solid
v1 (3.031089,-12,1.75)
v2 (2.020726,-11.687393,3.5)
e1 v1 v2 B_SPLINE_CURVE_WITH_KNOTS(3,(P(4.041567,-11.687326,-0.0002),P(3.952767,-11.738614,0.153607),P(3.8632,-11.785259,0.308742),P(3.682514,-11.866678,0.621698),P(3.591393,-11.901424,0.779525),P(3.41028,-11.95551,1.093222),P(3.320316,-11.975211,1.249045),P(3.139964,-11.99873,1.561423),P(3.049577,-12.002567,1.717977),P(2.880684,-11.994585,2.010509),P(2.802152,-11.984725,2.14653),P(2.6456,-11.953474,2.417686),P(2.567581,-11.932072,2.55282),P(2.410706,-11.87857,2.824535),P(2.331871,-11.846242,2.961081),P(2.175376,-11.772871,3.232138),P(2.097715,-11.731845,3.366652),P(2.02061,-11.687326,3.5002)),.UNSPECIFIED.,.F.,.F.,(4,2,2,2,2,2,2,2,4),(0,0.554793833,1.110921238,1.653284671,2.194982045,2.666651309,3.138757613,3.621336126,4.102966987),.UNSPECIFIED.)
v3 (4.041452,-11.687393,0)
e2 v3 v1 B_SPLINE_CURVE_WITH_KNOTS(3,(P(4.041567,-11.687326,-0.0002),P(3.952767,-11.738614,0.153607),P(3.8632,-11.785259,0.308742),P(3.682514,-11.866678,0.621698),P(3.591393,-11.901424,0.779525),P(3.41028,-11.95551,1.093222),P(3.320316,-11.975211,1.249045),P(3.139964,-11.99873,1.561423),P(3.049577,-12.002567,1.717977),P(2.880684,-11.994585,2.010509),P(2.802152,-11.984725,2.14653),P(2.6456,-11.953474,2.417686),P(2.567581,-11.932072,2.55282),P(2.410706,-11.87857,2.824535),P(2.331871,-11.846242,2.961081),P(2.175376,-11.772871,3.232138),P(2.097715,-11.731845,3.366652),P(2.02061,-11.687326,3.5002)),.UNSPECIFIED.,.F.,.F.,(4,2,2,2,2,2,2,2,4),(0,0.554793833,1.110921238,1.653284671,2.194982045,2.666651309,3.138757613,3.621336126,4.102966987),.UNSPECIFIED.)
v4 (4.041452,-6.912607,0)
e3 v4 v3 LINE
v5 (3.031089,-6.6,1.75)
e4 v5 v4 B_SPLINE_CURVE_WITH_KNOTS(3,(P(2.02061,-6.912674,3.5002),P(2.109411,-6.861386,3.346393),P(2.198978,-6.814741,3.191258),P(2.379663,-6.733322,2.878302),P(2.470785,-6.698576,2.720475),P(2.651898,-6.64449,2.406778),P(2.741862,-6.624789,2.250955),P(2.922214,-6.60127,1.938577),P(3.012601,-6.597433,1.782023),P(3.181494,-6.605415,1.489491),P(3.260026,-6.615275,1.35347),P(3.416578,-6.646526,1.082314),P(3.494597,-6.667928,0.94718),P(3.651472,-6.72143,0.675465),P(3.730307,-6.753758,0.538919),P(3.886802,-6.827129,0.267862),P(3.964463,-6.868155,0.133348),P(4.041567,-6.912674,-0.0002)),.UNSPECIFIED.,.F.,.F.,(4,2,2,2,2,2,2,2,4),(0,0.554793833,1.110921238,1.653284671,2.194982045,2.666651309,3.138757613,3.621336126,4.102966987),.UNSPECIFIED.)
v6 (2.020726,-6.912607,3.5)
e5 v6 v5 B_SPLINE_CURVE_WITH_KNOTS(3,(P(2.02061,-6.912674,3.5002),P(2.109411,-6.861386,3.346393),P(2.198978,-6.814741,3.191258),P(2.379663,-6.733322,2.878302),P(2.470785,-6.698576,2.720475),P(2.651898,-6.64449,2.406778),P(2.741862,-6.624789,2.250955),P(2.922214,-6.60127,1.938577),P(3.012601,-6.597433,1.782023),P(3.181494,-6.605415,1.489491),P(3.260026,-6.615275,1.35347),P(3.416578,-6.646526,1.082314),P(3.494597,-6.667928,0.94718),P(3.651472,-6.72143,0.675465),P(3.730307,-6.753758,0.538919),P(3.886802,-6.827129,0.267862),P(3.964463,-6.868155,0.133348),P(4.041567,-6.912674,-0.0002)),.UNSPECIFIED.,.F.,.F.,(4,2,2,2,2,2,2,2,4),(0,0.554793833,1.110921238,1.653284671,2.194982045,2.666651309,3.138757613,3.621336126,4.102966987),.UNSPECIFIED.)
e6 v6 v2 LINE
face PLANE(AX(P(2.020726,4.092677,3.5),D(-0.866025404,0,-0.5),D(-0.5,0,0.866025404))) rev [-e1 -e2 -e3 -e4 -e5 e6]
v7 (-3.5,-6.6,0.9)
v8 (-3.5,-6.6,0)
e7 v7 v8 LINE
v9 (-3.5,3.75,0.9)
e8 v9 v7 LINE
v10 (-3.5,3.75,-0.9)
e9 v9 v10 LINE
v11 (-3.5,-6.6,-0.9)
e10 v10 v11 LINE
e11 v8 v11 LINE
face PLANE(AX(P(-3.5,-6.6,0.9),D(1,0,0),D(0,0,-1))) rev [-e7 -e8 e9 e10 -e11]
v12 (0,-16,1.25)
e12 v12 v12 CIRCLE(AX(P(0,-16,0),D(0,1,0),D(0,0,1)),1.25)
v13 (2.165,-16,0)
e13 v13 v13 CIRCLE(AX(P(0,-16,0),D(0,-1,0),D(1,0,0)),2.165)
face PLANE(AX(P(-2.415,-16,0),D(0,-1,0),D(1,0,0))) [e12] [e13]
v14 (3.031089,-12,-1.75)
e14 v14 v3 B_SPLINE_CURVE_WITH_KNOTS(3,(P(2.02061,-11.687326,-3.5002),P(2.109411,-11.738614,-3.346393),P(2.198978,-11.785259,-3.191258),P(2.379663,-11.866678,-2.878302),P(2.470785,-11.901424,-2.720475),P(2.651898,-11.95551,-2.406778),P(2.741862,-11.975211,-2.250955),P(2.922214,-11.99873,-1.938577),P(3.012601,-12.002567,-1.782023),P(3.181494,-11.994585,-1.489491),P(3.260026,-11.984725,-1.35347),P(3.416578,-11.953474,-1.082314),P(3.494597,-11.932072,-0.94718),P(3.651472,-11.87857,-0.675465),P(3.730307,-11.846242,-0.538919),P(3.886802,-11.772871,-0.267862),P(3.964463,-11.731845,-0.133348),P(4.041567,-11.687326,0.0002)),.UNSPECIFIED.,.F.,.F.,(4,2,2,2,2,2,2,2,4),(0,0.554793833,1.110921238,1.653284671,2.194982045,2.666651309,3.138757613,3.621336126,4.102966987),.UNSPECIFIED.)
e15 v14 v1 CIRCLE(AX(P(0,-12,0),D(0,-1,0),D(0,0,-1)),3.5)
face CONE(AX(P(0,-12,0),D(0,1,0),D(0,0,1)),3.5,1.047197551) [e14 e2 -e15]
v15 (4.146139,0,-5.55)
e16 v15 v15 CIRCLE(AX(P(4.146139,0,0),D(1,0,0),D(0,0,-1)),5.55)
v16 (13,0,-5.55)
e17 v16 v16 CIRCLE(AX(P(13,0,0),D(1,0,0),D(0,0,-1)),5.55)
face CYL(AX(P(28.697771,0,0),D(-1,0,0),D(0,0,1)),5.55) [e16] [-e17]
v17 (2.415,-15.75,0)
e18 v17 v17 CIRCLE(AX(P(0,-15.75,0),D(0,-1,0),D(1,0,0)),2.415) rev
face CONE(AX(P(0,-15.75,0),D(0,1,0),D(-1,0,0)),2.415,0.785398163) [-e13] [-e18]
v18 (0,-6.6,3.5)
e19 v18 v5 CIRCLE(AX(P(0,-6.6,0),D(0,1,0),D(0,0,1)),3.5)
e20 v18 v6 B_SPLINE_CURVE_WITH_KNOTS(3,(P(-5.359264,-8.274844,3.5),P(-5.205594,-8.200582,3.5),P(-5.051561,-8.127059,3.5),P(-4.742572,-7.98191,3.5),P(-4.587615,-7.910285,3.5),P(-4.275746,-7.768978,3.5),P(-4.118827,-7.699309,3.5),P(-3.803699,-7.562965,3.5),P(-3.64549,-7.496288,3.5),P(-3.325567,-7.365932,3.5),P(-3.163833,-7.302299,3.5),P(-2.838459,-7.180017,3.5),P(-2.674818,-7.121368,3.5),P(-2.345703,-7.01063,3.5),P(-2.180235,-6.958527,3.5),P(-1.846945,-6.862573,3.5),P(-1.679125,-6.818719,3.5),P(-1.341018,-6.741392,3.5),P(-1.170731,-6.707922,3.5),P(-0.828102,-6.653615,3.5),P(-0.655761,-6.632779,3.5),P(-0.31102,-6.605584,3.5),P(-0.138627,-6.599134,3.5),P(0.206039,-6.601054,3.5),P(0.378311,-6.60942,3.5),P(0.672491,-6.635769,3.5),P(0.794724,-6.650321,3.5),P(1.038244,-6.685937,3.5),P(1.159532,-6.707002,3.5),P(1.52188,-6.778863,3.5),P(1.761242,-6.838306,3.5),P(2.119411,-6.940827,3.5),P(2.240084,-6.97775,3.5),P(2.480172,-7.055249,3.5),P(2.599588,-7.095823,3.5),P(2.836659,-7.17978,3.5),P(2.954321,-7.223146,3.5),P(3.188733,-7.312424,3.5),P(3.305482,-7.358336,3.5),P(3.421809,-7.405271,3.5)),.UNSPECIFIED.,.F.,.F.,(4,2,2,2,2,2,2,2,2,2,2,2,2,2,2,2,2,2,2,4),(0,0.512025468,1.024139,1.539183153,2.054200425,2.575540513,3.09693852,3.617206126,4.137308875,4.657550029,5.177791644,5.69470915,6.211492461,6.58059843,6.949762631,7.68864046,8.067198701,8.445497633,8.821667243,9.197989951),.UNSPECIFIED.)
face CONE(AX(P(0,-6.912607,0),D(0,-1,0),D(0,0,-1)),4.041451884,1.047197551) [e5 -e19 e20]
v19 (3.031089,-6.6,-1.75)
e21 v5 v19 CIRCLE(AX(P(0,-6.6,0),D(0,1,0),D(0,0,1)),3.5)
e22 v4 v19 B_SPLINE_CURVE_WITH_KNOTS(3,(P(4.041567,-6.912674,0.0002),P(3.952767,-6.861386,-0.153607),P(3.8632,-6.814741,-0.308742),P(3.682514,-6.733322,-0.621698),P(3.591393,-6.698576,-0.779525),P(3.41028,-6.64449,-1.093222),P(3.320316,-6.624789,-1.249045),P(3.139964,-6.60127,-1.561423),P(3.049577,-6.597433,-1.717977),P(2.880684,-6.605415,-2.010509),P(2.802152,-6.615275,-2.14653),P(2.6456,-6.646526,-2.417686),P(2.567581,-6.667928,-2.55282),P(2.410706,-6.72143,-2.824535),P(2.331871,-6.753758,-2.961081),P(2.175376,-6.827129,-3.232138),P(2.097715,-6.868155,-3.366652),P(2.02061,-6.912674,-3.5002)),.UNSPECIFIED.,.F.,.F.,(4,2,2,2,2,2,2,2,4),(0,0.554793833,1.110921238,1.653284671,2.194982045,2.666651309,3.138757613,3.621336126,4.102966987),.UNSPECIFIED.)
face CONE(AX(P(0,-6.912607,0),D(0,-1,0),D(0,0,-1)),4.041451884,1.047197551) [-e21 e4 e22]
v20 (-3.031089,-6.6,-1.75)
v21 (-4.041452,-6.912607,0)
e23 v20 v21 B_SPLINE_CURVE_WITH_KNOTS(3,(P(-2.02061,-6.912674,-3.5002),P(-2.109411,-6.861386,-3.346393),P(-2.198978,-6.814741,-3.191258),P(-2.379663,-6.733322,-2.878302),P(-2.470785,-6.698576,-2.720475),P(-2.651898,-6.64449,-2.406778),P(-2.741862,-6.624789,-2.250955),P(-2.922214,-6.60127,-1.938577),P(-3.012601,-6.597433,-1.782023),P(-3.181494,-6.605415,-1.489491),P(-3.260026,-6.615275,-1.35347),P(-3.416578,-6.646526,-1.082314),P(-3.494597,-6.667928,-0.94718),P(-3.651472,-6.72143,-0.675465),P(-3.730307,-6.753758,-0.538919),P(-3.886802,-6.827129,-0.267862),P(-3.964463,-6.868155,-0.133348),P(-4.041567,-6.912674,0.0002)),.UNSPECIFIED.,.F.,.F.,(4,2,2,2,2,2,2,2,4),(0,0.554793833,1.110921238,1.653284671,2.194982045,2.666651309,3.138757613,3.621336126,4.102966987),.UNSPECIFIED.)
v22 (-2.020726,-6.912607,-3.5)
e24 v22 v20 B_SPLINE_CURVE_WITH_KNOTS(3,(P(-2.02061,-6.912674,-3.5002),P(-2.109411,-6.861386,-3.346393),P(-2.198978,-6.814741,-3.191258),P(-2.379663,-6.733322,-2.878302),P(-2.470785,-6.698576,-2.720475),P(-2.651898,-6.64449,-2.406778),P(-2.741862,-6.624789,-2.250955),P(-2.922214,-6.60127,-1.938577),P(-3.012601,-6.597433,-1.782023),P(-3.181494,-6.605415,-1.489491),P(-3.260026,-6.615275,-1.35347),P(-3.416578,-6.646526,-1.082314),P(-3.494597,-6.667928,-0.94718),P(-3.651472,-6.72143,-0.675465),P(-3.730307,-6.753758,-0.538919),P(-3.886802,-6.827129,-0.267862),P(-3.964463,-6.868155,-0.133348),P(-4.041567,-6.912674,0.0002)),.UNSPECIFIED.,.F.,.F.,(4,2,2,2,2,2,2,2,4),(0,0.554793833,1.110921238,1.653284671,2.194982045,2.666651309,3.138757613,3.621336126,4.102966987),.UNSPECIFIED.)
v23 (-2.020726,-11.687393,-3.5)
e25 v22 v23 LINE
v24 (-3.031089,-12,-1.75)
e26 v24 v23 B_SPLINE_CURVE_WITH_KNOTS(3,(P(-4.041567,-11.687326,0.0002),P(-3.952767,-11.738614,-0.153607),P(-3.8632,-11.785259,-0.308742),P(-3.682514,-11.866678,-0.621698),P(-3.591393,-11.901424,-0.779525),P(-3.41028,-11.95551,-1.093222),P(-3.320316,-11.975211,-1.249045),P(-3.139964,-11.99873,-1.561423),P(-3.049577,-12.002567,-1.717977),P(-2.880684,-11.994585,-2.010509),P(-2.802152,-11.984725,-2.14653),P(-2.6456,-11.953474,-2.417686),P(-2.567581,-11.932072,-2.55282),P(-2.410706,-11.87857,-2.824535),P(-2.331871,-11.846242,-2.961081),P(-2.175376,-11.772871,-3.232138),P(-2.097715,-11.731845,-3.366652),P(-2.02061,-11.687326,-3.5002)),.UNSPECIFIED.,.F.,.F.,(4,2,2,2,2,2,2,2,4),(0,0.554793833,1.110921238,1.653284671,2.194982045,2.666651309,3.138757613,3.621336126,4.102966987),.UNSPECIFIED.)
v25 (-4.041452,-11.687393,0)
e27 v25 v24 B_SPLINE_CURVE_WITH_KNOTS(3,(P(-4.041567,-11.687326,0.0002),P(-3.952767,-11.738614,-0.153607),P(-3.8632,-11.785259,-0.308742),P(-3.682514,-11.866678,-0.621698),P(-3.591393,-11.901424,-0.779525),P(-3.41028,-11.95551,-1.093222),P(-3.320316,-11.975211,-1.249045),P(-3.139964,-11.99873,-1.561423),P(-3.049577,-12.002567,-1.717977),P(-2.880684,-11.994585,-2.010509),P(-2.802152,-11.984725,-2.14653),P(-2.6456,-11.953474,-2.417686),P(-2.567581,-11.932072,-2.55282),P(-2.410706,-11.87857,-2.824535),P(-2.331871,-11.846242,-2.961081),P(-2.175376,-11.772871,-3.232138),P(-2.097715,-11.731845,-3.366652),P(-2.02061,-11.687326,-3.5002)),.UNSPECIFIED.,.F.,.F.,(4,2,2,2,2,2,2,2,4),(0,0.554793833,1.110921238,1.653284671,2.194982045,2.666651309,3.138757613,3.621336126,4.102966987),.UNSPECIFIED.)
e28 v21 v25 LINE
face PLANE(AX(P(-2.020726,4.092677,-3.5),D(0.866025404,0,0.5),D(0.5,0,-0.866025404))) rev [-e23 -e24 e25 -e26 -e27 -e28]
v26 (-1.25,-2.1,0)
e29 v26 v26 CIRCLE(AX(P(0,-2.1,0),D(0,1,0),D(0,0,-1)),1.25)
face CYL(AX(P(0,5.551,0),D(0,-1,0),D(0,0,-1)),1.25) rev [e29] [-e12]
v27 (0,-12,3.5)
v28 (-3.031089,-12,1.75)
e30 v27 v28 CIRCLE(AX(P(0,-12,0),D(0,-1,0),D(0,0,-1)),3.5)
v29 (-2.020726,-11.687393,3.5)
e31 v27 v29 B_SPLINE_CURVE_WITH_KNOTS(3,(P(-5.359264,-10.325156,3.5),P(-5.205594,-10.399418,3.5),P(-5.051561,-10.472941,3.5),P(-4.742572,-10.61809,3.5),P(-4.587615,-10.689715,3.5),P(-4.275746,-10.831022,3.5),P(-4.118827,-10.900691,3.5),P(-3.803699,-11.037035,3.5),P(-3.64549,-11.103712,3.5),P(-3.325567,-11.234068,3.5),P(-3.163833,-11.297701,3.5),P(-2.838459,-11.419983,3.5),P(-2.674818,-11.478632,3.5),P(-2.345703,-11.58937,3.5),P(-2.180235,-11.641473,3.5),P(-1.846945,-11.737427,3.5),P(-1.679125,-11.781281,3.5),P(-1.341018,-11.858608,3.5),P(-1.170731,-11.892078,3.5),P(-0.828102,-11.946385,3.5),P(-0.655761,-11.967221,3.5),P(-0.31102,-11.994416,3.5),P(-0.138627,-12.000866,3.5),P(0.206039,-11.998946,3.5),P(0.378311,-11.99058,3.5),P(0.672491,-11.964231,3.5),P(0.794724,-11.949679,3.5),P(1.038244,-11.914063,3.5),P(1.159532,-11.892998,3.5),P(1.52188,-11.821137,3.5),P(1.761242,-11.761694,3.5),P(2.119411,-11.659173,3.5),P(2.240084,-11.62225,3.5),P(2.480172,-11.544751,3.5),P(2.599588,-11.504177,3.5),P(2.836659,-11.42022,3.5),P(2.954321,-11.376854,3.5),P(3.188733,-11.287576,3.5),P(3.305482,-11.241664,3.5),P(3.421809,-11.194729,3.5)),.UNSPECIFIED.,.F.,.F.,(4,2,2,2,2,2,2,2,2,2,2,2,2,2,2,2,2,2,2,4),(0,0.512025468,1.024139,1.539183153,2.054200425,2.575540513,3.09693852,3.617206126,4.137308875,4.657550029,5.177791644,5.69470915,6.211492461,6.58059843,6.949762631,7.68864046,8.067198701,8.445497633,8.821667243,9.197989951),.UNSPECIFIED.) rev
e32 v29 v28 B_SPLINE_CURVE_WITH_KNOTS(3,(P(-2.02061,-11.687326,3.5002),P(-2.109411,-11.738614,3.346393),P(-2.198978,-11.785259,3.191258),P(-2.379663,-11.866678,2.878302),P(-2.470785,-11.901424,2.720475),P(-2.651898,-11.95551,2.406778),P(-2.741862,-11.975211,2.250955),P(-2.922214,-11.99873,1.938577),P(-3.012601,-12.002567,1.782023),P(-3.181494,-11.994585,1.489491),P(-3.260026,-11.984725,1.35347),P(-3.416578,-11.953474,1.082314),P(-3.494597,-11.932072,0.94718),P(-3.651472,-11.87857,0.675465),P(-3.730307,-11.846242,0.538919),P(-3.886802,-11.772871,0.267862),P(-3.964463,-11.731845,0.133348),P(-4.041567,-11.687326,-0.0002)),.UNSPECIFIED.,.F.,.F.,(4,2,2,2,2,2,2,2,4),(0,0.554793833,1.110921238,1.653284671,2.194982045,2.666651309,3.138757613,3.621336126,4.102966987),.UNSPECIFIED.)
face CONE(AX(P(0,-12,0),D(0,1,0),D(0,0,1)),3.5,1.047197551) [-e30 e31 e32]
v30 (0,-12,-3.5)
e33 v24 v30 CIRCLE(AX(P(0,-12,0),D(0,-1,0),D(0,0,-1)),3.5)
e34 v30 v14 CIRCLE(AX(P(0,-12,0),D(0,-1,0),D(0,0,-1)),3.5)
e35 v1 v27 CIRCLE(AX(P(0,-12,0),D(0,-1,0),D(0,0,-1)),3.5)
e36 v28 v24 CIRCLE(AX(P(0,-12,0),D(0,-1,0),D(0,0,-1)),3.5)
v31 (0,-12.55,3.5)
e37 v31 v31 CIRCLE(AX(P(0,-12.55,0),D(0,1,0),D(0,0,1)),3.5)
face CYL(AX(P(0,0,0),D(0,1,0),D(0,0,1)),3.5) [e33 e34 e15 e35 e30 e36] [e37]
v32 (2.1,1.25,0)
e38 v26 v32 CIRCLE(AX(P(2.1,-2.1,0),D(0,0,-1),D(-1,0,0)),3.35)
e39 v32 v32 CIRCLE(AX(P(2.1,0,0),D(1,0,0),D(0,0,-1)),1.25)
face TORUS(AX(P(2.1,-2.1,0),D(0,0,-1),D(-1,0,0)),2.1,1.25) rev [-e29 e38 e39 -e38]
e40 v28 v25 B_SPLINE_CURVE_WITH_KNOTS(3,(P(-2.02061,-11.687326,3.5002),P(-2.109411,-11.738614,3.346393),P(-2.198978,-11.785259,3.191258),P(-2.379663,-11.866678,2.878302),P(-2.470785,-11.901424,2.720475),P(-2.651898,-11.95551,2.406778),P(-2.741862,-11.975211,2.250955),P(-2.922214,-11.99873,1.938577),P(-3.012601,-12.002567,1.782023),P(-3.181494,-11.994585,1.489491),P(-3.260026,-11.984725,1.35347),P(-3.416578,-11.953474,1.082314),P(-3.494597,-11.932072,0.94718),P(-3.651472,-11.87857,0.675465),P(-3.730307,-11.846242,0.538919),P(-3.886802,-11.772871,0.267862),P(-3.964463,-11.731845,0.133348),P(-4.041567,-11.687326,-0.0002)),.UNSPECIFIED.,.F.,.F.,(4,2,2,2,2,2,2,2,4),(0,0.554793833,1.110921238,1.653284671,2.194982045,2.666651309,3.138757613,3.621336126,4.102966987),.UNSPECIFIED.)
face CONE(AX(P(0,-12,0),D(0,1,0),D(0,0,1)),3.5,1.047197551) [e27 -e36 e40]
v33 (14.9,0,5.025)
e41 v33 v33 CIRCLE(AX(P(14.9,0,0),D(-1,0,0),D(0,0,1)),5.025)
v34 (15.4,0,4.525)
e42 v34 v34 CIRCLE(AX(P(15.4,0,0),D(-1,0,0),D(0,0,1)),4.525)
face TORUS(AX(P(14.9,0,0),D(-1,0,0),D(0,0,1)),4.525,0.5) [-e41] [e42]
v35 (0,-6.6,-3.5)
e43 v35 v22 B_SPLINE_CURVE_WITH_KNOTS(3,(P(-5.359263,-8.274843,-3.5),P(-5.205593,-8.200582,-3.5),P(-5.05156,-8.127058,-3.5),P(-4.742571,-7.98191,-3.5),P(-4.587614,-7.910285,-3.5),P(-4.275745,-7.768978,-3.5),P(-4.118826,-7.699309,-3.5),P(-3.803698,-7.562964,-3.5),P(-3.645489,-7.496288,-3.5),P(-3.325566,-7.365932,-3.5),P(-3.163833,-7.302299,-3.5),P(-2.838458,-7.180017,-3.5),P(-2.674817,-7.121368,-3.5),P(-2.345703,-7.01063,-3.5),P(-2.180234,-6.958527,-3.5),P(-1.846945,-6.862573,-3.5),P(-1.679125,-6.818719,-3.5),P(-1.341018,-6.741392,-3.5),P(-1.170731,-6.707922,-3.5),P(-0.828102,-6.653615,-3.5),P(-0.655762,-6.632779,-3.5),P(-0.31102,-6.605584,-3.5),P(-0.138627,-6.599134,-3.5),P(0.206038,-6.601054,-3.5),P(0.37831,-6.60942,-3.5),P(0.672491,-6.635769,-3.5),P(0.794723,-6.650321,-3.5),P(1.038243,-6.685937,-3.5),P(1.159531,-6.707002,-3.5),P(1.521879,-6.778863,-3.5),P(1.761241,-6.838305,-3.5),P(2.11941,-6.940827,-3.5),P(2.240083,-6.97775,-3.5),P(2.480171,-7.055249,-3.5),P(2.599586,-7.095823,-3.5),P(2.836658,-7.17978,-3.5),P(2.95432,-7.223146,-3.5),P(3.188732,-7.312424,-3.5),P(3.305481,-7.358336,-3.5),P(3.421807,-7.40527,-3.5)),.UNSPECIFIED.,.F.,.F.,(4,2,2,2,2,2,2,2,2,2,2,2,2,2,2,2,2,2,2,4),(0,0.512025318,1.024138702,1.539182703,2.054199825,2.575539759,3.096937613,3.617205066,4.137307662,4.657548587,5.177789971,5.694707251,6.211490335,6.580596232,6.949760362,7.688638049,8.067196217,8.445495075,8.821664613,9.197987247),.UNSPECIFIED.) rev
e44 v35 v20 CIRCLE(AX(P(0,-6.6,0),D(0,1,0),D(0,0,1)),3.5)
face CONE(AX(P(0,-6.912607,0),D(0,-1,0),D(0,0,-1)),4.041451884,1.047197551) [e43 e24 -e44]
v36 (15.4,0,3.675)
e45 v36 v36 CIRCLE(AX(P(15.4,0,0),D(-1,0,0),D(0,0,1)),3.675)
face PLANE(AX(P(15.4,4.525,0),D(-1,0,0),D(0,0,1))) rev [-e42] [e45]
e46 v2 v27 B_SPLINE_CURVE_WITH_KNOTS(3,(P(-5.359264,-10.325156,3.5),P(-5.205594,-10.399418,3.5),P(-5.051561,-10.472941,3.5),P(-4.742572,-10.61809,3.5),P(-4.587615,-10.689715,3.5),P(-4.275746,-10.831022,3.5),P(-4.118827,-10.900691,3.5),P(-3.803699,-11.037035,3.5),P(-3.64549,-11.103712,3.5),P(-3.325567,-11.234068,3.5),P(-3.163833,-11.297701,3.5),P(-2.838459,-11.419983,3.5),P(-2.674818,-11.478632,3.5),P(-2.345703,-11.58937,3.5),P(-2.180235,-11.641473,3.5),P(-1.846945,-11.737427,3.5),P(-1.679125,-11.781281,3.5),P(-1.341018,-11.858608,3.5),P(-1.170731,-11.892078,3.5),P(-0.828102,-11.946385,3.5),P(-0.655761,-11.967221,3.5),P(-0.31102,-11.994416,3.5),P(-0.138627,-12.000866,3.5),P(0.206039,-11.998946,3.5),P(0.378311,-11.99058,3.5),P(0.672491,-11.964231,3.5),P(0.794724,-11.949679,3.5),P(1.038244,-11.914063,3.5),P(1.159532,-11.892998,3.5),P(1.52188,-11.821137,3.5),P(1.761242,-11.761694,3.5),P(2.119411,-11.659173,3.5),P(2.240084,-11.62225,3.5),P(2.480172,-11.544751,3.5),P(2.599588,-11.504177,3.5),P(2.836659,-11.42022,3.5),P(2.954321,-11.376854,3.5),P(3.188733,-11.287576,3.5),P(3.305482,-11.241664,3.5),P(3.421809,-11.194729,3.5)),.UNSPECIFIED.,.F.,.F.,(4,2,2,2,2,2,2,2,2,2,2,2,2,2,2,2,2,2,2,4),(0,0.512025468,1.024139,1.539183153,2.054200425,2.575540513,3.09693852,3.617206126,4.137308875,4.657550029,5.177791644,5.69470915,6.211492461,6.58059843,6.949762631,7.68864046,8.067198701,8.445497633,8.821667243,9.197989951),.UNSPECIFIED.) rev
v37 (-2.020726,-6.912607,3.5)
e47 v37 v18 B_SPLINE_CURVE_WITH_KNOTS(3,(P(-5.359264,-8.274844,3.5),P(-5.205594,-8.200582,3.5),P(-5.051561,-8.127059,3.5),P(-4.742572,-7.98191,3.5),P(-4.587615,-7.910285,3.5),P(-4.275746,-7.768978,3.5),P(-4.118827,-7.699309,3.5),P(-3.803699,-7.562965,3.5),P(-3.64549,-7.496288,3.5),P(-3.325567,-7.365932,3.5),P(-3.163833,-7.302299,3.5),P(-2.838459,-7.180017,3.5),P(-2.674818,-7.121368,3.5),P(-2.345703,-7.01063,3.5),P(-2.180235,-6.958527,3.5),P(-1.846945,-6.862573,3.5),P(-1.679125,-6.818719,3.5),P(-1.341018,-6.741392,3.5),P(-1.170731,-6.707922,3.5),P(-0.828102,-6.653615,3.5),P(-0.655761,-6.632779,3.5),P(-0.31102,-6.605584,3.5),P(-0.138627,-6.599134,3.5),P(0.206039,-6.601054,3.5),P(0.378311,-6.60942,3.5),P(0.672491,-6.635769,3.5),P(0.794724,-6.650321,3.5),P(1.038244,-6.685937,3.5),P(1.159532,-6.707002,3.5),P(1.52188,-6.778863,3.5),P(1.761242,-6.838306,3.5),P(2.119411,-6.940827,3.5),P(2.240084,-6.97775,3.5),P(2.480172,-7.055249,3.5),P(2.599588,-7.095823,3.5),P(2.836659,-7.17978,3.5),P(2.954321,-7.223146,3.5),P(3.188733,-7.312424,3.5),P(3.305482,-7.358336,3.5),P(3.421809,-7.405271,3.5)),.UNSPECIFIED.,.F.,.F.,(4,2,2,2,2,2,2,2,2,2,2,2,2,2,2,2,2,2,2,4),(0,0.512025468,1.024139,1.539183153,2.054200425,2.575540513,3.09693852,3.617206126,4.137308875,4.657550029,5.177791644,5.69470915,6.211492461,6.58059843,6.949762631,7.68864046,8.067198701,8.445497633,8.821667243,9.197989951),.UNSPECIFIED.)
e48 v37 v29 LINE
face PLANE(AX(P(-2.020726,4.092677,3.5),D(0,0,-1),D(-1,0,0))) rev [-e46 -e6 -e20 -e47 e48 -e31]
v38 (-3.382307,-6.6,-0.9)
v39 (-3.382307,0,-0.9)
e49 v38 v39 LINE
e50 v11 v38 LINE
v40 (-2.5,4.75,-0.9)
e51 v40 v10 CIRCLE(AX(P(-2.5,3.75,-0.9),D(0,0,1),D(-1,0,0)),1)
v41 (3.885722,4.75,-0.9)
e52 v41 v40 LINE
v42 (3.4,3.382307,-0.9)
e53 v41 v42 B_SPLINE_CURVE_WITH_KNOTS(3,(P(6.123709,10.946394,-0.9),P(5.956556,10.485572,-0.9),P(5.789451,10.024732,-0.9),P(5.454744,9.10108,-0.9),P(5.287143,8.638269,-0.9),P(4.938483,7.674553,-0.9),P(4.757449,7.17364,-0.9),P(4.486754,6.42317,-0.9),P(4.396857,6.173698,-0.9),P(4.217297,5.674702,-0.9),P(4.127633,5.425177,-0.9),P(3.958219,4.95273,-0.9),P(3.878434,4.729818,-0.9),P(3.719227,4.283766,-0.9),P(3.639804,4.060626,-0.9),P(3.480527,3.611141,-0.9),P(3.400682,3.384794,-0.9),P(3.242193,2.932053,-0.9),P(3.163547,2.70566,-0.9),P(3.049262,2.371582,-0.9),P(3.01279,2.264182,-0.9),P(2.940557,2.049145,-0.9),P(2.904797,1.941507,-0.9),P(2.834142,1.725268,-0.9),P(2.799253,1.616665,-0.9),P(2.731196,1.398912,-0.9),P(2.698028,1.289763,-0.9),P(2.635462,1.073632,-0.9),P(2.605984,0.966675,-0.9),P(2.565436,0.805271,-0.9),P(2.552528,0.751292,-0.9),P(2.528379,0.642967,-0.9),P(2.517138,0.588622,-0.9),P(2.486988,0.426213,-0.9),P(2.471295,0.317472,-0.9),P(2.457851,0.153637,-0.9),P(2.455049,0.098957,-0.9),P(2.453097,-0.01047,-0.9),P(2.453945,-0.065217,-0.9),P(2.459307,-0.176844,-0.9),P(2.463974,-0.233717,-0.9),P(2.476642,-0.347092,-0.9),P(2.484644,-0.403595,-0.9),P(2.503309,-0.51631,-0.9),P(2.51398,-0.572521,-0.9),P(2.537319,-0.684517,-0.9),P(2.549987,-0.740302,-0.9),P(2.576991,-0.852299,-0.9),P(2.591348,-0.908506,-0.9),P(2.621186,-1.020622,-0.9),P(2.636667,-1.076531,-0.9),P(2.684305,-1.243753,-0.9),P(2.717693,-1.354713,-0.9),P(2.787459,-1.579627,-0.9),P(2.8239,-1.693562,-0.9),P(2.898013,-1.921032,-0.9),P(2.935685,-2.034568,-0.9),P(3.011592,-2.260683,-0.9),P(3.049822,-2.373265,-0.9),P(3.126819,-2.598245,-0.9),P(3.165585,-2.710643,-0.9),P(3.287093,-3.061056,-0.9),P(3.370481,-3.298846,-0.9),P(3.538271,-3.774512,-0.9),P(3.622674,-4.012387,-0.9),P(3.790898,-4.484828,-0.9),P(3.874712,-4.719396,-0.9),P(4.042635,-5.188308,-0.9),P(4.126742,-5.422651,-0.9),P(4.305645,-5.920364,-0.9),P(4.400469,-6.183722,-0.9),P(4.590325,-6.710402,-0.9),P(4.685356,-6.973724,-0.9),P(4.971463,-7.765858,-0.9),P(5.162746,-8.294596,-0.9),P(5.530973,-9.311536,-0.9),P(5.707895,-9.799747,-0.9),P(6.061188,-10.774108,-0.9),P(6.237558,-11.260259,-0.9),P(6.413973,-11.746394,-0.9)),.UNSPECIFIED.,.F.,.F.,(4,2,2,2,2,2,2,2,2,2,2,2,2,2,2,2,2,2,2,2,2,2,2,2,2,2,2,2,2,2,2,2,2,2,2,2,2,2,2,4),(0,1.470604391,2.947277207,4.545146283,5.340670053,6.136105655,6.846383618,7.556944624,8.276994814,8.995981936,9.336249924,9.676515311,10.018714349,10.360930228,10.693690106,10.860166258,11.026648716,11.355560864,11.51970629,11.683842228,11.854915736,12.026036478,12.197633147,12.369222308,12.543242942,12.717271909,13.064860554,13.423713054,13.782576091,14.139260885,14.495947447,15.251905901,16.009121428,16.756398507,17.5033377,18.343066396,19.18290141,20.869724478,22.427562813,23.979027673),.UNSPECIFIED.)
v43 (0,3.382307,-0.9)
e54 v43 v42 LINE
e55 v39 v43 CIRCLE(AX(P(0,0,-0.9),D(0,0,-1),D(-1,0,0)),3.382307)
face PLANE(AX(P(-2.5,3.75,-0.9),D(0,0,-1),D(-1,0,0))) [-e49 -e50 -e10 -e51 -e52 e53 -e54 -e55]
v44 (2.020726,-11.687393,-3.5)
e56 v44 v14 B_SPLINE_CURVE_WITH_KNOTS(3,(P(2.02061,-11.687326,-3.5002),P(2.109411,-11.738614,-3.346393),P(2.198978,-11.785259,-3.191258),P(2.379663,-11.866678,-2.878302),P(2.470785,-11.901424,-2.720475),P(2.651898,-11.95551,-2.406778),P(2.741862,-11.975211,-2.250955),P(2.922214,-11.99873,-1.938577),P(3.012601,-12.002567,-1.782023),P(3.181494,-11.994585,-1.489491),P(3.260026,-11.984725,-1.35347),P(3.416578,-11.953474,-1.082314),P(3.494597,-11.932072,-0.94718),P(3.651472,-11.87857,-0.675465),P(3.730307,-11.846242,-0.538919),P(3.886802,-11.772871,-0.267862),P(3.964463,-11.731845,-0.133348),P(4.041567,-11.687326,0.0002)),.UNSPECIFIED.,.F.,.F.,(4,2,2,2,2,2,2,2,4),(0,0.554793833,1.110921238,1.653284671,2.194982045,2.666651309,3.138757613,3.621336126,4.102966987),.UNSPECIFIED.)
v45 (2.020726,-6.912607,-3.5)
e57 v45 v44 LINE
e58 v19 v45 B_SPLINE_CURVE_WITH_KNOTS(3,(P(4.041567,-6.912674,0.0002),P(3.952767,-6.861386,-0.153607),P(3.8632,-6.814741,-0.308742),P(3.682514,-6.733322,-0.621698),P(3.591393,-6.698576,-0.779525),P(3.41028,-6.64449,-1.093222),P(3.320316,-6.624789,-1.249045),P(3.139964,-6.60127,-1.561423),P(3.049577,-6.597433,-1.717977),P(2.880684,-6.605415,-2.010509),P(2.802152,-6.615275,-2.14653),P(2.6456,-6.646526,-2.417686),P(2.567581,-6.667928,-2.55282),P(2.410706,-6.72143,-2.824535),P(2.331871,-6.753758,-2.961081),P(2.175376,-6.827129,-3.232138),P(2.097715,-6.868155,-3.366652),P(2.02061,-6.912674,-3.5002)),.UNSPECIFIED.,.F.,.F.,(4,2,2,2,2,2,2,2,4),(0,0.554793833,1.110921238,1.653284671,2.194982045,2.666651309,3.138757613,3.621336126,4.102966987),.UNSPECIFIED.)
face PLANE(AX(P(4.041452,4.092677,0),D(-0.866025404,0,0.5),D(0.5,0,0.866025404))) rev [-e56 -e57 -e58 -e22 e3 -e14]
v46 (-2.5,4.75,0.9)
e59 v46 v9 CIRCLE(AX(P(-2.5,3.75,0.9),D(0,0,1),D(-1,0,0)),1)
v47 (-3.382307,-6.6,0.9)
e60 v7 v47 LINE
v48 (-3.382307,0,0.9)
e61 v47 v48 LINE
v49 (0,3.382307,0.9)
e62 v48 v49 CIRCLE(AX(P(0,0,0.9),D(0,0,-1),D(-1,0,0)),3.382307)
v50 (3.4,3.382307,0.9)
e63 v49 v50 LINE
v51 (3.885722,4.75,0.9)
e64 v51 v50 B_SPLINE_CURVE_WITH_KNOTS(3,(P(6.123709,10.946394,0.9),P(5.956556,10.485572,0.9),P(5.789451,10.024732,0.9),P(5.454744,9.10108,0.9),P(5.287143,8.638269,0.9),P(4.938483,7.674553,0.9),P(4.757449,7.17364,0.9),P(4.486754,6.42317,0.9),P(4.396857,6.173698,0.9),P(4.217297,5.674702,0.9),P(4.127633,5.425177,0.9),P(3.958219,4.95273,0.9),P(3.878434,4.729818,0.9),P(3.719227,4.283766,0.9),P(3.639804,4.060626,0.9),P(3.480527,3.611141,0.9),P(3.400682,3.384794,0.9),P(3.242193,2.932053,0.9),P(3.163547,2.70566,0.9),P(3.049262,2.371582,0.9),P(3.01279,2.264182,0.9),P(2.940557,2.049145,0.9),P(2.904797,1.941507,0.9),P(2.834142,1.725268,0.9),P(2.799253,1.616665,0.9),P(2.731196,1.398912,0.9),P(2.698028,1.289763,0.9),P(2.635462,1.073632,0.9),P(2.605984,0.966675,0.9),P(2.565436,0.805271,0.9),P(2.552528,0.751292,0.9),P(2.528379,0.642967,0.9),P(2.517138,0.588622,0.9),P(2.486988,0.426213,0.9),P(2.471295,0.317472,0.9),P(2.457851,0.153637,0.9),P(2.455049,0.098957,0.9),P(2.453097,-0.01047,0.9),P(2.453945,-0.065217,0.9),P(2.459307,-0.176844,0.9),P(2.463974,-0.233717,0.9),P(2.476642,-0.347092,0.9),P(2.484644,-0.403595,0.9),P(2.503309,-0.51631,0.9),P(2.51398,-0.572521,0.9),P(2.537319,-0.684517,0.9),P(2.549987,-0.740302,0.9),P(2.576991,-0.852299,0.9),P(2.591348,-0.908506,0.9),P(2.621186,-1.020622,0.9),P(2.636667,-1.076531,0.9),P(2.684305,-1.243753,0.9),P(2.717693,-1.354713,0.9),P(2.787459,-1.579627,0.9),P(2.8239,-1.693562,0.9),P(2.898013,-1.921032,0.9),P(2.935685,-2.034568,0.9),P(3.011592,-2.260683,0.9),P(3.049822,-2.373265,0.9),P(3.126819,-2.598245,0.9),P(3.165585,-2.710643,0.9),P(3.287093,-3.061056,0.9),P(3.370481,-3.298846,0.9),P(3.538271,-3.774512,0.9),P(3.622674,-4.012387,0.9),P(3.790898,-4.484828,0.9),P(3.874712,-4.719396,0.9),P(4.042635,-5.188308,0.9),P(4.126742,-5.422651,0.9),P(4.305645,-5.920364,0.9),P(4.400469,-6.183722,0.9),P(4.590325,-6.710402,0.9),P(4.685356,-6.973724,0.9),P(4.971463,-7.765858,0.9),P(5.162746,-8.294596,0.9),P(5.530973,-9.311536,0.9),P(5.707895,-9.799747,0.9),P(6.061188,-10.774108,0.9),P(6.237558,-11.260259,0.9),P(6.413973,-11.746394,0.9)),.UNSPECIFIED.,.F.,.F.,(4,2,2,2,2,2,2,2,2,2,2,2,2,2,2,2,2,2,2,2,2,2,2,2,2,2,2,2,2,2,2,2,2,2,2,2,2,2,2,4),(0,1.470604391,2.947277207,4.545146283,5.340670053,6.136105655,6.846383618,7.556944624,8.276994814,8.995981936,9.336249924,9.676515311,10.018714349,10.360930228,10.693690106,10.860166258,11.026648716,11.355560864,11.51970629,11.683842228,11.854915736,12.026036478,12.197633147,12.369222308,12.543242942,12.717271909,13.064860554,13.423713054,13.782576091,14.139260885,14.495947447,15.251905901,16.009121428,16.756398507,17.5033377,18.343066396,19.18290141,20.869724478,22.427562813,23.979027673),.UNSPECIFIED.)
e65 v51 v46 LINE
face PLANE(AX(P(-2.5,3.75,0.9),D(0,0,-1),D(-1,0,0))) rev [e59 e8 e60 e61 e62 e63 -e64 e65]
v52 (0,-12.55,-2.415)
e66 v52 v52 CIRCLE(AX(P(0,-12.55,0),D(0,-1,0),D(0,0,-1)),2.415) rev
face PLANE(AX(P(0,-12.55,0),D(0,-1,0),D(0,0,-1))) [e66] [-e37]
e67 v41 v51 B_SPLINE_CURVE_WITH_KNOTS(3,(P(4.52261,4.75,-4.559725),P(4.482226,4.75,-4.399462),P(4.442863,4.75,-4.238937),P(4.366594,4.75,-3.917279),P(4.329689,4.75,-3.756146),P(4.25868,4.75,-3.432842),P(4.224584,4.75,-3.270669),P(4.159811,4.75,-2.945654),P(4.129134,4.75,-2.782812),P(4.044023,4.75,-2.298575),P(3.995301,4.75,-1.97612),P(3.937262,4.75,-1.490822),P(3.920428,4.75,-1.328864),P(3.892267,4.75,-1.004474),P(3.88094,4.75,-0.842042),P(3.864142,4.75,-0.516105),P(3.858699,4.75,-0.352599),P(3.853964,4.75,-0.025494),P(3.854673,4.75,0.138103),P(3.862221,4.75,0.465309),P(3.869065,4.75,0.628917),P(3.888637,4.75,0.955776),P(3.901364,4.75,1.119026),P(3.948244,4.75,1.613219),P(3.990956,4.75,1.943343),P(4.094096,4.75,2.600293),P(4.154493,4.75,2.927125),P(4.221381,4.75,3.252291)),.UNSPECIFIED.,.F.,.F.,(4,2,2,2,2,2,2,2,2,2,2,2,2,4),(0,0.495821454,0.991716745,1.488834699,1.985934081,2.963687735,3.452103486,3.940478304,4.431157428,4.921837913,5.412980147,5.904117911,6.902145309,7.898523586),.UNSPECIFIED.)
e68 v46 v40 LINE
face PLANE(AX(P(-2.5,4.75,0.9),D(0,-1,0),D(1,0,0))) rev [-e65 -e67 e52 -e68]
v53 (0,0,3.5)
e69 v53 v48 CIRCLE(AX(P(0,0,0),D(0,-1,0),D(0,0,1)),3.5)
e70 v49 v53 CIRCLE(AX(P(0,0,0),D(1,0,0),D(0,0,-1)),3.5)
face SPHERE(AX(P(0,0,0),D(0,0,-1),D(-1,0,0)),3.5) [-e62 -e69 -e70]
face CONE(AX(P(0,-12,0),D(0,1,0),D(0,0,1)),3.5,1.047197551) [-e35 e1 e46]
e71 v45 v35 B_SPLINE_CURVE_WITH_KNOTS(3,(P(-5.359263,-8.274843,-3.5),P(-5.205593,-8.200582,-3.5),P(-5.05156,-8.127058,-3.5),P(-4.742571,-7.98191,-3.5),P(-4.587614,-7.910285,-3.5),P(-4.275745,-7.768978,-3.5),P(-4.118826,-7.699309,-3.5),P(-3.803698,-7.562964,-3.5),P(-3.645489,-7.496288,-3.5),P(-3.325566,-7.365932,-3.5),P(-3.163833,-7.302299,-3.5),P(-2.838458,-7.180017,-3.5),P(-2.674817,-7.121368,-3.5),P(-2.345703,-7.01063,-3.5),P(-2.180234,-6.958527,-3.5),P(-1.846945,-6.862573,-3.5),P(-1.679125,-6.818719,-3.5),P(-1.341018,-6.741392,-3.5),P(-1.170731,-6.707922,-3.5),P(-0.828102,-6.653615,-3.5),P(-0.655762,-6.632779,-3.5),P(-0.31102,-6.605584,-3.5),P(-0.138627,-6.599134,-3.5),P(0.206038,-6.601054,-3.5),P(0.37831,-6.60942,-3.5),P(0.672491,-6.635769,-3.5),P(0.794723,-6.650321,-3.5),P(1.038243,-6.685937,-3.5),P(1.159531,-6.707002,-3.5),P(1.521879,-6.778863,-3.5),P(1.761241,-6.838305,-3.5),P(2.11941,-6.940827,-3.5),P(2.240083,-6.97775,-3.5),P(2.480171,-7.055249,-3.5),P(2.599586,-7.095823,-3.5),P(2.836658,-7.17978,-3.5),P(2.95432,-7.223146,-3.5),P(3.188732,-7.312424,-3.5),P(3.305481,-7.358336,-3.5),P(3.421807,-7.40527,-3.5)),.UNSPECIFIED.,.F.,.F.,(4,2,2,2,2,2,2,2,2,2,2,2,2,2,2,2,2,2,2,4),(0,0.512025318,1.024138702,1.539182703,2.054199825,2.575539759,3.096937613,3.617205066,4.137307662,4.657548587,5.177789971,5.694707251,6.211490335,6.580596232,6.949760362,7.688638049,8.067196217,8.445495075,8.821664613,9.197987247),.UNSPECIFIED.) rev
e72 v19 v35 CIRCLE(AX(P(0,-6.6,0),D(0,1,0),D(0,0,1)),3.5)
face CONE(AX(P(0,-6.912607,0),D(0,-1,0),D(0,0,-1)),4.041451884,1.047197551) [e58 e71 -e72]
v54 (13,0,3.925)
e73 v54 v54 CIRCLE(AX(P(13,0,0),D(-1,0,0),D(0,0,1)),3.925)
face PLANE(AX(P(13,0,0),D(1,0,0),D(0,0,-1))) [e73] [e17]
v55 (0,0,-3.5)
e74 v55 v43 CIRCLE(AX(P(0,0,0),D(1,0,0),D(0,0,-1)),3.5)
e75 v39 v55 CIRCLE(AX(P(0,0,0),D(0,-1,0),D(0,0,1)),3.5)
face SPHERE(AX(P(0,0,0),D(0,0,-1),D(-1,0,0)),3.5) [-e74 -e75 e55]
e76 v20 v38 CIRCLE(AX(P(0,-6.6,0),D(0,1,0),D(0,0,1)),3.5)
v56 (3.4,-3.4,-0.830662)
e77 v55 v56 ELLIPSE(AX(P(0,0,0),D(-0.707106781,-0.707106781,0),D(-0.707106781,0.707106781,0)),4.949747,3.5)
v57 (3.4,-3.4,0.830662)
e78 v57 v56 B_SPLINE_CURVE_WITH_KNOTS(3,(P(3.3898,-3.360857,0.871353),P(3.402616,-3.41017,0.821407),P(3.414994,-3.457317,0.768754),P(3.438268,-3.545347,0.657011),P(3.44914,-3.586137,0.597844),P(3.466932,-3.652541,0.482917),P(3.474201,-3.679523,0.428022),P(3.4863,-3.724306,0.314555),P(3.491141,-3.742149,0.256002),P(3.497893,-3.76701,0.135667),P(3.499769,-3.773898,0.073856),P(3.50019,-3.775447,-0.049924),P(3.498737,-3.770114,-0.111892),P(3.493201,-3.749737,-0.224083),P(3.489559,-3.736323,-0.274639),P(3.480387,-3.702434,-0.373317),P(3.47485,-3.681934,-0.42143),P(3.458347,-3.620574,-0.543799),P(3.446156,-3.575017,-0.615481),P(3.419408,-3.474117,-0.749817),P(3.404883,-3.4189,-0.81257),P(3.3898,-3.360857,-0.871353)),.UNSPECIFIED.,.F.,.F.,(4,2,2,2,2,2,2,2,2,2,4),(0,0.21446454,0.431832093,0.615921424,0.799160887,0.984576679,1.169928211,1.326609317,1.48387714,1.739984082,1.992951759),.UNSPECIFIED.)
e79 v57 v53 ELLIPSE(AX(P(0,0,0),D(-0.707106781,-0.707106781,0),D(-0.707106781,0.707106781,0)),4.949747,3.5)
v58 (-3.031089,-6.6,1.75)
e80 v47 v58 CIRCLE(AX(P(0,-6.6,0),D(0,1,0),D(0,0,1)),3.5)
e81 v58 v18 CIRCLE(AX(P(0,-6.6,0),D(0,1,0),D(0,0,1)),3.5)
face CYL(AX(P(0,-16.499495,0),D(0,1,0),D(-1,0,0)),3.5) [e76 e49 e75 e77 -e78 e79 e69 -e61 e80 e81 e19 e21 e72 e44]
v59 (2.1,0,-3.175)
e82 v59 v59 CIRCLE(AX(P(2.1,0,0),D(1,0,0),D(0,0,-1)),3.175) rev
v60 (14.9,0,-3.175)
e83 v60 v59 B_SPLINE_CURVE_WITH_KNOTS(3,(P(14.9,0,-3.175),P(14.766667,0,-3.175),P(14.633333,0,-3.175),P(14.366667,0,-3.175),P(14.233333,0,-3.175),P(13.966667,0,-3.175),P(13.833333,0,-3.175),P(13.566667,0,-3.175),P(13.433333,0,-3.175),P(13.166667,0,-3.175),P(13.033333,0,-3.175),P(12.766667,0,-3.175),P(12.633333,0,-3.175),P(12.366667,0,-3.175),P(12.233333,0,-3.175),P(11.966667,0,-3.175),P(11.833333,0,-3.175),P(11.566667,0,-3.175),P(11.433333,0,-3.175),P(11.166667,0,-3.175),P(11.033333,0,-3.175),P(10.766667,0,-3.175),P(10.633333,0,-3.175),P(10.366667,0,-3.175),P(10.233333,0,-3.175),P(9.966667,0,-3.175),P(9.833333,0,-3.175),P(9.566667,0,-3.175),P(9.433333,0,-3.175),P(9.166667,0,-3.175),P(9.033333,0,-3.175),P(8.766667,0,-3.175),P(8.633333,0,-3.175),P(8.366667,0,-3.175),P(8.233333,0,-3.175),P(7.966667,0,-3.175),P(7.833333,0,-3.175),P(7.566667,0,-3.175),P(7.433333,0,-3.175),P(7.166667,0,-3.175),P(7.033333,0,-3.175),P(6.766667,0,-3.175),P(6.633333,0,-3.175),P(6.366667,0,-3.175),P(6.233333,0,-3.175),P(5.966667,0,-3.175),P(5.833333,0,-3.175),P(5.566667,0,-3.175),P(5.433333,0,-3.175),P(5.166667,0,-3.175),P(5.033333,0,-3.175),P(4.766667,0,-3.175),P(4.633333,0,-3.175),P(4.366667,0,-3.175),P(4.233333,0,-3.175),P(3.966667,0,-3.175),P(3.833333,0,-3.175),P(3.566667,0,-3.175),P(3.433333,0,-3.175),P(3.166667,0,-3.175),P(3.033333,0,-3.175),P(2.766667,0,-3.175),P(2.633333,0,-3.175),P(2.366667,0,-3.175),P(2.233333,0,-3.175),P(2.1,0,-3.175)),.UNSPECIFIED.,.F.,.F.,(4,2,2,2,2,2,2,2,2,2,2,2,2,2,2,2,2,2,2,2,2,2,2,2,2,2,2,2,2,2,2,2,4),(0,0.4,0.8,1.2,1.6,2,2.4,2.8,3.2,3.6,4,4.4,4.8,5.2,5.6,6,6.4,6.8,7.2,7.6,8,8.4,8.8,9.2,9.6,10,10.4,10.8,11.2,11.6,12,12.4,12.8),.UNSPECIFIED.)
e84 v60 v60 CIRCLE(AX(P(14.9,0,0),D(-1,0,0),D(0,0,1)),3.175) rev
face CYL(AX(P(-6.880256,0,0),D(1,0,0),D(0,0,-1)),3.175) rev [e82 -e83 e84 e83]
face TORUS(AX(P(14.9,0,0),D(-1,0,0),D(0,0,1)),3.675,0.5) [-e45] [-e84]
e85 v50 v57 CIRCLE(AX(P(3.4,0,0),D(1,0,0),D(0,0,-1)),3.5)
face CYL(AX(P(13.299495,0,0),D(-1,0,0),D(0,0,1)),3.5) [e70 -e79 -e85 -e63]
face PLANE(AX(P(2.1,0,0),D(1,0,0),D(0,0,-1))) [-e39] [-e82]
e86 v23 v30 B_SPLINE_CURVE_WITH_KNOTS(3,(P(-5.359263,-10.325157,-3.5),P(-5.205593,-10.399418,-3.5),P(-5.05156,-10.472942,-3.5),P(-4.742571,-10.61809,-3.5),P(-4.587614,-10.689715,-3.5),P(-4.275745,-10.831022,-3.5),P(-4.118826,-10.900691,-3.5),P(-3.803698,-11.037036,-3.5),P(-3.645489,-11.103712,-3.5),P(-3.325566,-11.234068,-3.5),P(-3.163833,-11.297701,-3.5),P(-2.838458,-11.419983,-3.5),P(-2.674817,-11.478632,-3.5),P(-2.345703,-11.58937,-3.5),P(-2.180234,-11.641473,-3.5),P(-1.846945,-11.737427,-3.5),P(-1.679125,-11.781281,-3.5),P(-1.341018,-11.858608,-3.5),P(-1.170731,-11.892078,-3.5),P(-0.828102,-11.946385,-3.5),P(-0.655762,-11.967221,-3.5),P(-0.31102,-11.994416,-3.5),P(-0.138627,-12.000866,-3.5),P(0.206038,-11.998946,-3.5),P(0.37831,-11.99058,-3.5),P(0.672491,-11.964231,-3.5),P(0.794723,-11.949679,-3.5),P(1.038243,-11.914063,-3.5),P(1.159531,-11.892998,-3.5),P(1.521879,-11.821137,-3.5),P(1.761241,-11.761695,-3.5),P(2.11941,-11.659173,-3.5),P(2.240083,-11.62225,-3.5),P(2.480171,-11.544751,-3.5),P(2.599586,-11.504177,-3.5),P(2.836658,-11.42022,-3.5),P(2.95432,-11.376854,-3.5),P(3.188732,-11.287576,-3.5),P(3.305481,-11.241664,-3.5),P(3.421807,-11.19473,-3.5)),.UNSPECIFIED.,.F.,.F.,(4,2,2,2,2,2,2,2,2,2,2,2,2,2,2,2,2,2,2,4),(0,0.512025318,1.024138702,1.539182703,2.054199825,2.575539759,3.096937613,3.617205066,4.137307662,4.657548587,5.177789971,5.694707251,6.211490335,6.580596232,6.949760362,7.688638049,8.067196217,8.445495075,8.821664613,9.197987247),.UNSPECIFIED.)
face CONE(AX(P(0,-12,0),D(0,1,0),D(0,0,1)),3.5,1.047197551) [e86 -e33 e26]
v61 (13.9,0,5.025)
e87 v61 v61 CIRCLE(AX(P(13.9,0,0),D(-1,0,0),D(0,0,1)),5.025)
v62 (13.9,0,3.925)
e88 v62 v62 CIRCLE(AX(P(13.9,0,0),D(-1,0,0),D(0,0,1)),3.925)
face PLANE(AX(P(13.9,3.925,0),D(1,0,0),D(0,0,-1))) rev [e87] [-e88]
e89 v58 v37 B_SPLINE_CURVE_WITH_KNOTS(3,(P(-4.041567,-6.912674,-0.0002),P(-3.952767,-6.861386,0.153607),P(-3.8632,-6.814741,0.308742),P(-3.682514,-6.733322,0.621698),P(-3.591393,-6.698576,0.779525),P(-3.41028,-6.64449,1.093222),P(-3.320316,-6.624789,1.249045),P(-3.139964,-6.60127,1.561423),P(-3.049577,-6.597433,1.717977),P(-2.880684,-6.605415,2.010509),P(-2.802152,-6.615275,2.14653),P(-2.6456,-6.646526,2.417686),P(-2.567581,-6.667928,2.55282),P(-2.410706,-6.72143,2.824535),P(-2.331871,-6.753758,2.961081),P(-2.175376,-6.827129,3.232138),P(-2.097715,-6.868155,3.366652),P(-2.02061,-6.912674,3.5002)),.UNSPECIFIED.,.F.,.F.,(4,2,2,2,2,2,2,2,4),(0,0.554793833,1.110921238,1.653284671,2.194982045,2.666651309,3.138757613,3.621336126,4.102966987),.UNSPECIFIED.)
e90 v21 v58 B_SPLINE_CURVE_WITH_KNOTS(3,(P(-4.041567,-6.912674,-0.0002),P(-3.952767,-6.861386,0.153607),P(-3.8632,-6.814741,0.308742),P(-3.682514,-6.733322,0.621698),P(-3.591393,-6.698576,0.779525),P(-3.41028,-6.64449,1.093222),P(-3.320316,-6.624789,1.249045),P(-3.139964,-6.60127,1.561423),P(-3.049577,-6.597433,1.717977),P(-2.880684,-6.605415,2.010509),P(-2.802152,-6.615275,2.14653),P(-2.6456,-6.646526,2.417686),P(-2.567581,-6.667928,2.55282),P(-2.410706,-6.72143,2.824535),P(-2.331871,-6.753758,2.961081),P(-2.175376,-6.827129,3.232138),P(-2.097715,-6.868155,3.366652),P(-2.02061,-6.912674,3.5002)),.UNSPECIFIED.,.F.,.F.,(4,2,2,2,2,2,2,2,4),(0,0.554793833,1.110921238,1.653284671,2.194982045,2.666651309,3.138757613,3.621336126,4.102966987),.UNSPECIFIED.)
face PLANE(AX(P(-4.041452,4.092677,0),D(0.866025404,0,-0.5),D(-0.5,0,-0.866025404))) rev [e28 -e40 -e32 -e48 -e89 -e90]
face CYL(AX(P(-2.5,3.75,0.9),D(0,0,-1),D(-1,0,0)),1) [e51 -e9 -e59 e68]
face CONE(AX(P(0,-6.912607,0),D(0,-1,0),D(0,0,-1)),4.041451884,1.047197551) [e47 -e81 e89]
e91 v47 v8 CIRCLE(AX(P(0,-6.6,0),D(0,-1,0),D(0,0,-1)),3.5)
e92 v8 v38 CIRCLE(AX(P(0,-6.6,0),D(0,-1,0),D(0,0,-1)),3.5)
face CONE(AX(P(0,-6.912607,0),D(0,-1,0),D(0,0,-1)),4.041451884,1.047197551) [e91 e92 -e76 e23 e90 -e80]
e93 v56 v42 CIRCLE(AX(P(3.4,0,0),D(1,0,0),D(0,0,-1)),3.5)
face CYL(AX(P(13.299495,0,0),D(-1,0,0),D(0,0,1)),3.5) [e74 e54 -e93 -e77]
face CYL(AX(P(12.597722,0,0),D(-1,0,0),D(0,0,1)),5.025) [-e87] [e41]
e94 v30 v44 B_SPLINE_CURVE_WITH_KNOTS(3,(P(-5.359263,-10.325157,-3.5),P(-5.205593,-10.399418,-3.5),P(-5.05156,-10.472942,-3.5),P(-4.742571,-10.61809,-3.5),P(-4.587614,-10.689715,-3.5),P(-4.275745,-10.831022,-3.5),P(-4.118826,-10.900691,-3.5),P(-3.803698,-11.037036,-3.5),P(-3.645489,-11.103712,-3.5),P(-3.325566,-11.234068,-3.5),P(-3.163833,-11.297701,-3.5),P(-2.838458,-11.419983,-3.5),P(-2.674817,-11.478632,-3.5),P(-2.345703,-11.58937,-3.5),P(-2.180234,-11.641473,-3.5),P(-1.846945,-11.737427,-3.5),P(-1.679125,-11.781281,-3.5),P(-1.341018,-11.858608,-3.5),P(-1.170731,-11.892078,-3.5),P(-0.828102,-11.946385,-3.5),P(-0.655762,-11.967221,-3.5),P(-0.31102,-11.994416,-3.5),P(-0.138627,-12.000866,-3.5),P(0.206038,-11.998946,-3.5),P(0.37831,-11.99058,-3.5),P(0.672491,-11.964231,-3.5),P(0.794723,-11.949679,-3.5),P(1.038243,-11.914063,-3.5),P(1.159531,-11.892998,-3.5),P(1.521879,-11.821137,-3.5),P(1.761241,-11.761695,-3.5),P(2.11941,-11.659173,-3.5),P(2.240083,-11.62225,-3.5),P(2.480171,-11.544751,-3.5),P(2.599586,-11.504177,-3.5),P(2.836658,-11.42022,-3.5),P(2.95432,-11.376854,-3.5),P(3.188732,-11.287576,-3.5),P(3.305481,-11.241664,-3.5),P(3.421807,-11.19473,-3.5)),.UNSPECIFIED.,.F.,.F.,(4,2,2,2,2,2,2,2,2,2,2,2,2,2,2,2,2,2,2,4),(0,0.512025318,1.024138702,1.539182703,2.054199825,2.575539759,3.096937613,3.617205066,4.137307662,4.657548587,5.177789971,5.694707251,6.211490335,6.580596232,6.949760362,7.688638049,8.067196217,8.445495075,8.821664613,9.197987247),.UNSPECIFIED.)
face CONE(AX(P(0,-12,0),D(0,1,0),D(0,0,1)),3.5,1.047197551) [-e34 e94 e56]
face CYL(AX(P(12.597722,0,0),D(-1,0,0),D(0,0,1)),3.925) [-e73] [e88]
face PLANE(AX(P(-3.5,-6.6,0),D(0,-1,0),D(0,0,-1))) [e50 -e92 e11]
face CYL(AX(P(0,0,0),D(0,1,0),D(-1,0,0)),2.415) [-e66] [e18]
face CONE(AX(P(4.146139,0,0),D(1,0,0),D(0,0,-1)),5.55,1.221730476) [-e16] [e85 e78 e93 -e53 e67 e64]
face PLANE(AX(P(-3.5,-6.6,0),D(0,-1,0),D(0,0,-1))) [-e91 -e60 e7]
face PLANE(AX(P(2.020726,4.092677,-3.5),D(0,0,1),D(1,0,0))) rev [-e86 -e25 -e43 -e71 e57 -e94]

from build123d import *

# Parameters (mm, degrees)
SKETCH1_R             = 3.5
BASE_EXTRUDE_DEPTH    = 3.4
RBODY_SKETCH_R        = 5.55
RBODY_DEPTH           = 9.6
ELBOW_ANGLE           = 90
SKETCH3_R             = 3.5
BOSS_EXTRUDE1_DEPTH   = 6.6
BOSS_EXTRUDE2_DEPTH   = 0.9
NUT_DEPTH             = 5.4
THREADS_SKETCH_W      = 2.415
THREADS_SKETCH_H      = 4
THREAD_CHAMFER_SIZE   = 0.25
RTUBE_START           = -13.3
RTUBE_SKETCH_R        = 3.175
RTUBE_DEPTH           = 13.3
RTUBE_RADIUS_R        = 0.5
DIAMETER_R            = 1.25
SKETCH4_W             = 3.5
SKETCH4_H             = 0.55
PORT_THREADS_REACH    = 29.062
PORT_THREADS_SKETCH_R = 1.25


with BuildPart() as part:
    # Sketch1 → Base-Extrude (new body)
    with BuildSketch(Plane(origin=(0, 0, 0), x_dir=(0, 0, -1), z_dir=(1, 0, 0))):
        Circle(SKETCH1_R)
    extrude(amount=BASE_EXTRUDE_DEPTH)

    # RBody_Sketch → RBody (add)
    with BuildSketch(Plane(origin=(3.4, 0, 0), x_dir=(0, 0, -1), z_dir=(1, 0, 0))):
        Circle(RBODY_SKETCH_R)
    extrude(amount=RBODY_DEPTH)

    # RBody_Chamfer: read off the stored shape, not the designer's step
    # RBody_Chamfer outline → RBody_Chamfer (revolve, cut)
    with BuildSketch(Plane.YX):
        Polygon((5.55, 4.14613898), (3.5, 3.4), (5.55, 3.4), align=None)
    revolve(axis=Axis((0, 0, 0), (1, 0, 0)), mode=Mode.SUBTRACT)

    # RRelease_Sketch → RRelease (revolve)
    with BuildSketch(Plane.XY, mode=Mode.PRIVATE) as rrelease_sk:
        with BuildLine():
            Line((13, 3.925), (13.9, 3.925))
            Line((13.9, 3.925), (13.9, 5.025))
            Line((13.9, 5.025), (14.9, 5.025))
            ThreePointArc((14.9, 5.025), (15.253553391, 4.878553391), (15.4, 4.525))
            Line((15.4, 4.525), (15.4, 0))
            Line((15.4, 0), (13, 0))
            Line((13, 0), (13, 3.925))
        make_face()
    revolve(rrelease_sk.sketch.rotate(Axis((12.597722381, 0, 0), (1, 0, 0)), 90), axis=Axis((12.597722381, 0, 0), (1, 0, 0)))

    # Elbow_Sketch → Elbow (revolve)
    with BuildSketch(Plane.ZY):
        with BuildLine():
            Line((-3.5, 0), (3.5, 0))
            ThreePointArc((3.5, 0), (0, 3.5), (-3.5, 0))
        make_face()
    revolve(axis=Axis((0, 0, -6.487672297), (0, 0, 1)), revolution_arc=ELBOW_ANGLE)

    # Sketch3 → Boss-Extrude1 (add)
    with BuildSketch(Plane.XZ):
        with Locations(Location((0, 0, 0), (0, 0, 90))):
            Circle(SKETCH3_R)
    extrude(amount=BOSS_EXTRUDE1_DEPTH)

    # Sketch8 → Boss-Extrude2 (add, symmetric)
    with BuildSketch(Plane.XY):
        with BuildLine():
            Line((-3.5, -6.6), (-3.5, 3.75))
            ThreePointArc((-3.5, 3.75), (-3.207106781, 4.457106781), (-2.5, 4.75))
            Line((-2.5, 4.75), (4.14613898, 4.75))
            Line((4.14613898, 4.75), (4.14613898, 0))
            Line((4.14613898, 0), (0, 0))
            Line((0, 0), (0, -6.6))
            Line((0, -6.6), (-3.5, -6.6))
        make_face()
    extrude(amount=BOSS_EXTRUDE2_DEPTH, both=True)

    # Nut_Sketch → Nut (add)
    with BuildSketch(Plane(origin=(0, -12, 0), x_dir=(-1, 0, 0), z_dir=(0, 1, 0))):
        Polygon((4.041451884, 0), (2.020725942, 3.5), (-2.020725942, 3.5), (-4.041451884, 0), (-2.020725942, -3.5), (2.020725942, -3.5), align=None)
    extrude(amount=NUT_DEPTH)

    # Nut_Chamfer_Sketch → Nut_Chamfer (revolve, cut)
    with BuildSketch(Plane.XY):
        Polygon((-3.5, -6.6), (-4.041451884, -6.6), (-4.041451884, -6.912607391), align=None)
        Polygon((-4.041451884, -11.687392609), (-3.5, -12), (-4.041451884, -12), align=None)
    revolve(axis=Axis((0, -1.551633987, 0), (0, 1, 0)), mode=Mode.SUBTRACT)

    # Threads_Sketch → Threads (revolve)
    with BuildSketch(Plane.XY):
        with Locations((-1.2075, -14)):
            Rectangle(THREADS_SKETCH_W, THREADS_SKETCH_H)
    revolve(axis=Axis((0, 0, 0), (0, -1, 0)))

    # Thread_Chamfer
    thread_chamfer_edges = [part.edges().sort_by_distance(p)[0] for p in [
        (2.415, -16, 0),
    ]]
    chamfer(thread_chamfer_edges, length=THREAD_CHAMFER_SIZE)

    # RTube_Sketch → RTube (cut)
    with BuildSketch(Plane(origin=(15.4, 0, 0), x_dir=(0, 0, -1), z_dir=(1, 0, 0)).offset(RTUBE_START)):
        Circle(RTUBE_SKETCH_R)
    extrude(amount=RTUBE_DEPTH, mode=Mode.SUBTRACT)

    # RTube_Radius
    rtube_radius_edges = [part.edges().sort_by_distance(p)[0] for p in [
        (15.4, 0, 3.175),
    ]]
    fillet(rtube_radius_edges, radius=RTUBE_RADIUS_R)

    # Port_Curve: sweep along a path in Profile
    with BuildLine(Plane.XY) as port_curve_path:
        ThreePointArc((2.1, 0), (0.61507576, -0.61507576), (0, -2.1))
    # Diameter → Port_Curve (sweep, cut)
    with BuildSketch(Plane(origin=(2.1, 0, 0), x_dir=(0, 0, -1), z_dir=(1, 0, 0))):
        Circle(DIAMETER_R)
    sweep(path=port_curve_path.line, mode=Mode.SUBTRACT)

    # Sketch4 → Revolve1 (revolve)
    with BuildSketch(Plane.XY, mode=Mode.PRIVATE) as revolve1_sk:
        with Locations((-1.75, -12.275)):
            Rectangle(SKETCH4_W, SKETCH4_H)
    revolve(revolve1_sk.sketch.rotate(Axis((0, 0, 0), (0, -1, 0)), 180), axis=Axis((0, 0, 0), (0, -1, 0)))

    # Port_Threads_Sketch → Port_Threads (cut, up to next)
    with BuildSketch(Plane(origin=(0, -16, 0), x_dir=(-1, 0, 0), z_dir=(0, 1, 0)), mode=Mode.PRIVATE) as port_threads_sk1:
        Circle(PORT_THREADS_SKETCH_R)
    port_threads_tool1 = extrude(port_threads_sk1.sketch, amount=PORT_THREADS_REACH, mode=Mode.PRIVATE) & part.part
    add(port_threads_tool1.solids().sort_by_distance((0, -16, 0))[0], mode=Mode.SUBTRACT)


solid = part.part
